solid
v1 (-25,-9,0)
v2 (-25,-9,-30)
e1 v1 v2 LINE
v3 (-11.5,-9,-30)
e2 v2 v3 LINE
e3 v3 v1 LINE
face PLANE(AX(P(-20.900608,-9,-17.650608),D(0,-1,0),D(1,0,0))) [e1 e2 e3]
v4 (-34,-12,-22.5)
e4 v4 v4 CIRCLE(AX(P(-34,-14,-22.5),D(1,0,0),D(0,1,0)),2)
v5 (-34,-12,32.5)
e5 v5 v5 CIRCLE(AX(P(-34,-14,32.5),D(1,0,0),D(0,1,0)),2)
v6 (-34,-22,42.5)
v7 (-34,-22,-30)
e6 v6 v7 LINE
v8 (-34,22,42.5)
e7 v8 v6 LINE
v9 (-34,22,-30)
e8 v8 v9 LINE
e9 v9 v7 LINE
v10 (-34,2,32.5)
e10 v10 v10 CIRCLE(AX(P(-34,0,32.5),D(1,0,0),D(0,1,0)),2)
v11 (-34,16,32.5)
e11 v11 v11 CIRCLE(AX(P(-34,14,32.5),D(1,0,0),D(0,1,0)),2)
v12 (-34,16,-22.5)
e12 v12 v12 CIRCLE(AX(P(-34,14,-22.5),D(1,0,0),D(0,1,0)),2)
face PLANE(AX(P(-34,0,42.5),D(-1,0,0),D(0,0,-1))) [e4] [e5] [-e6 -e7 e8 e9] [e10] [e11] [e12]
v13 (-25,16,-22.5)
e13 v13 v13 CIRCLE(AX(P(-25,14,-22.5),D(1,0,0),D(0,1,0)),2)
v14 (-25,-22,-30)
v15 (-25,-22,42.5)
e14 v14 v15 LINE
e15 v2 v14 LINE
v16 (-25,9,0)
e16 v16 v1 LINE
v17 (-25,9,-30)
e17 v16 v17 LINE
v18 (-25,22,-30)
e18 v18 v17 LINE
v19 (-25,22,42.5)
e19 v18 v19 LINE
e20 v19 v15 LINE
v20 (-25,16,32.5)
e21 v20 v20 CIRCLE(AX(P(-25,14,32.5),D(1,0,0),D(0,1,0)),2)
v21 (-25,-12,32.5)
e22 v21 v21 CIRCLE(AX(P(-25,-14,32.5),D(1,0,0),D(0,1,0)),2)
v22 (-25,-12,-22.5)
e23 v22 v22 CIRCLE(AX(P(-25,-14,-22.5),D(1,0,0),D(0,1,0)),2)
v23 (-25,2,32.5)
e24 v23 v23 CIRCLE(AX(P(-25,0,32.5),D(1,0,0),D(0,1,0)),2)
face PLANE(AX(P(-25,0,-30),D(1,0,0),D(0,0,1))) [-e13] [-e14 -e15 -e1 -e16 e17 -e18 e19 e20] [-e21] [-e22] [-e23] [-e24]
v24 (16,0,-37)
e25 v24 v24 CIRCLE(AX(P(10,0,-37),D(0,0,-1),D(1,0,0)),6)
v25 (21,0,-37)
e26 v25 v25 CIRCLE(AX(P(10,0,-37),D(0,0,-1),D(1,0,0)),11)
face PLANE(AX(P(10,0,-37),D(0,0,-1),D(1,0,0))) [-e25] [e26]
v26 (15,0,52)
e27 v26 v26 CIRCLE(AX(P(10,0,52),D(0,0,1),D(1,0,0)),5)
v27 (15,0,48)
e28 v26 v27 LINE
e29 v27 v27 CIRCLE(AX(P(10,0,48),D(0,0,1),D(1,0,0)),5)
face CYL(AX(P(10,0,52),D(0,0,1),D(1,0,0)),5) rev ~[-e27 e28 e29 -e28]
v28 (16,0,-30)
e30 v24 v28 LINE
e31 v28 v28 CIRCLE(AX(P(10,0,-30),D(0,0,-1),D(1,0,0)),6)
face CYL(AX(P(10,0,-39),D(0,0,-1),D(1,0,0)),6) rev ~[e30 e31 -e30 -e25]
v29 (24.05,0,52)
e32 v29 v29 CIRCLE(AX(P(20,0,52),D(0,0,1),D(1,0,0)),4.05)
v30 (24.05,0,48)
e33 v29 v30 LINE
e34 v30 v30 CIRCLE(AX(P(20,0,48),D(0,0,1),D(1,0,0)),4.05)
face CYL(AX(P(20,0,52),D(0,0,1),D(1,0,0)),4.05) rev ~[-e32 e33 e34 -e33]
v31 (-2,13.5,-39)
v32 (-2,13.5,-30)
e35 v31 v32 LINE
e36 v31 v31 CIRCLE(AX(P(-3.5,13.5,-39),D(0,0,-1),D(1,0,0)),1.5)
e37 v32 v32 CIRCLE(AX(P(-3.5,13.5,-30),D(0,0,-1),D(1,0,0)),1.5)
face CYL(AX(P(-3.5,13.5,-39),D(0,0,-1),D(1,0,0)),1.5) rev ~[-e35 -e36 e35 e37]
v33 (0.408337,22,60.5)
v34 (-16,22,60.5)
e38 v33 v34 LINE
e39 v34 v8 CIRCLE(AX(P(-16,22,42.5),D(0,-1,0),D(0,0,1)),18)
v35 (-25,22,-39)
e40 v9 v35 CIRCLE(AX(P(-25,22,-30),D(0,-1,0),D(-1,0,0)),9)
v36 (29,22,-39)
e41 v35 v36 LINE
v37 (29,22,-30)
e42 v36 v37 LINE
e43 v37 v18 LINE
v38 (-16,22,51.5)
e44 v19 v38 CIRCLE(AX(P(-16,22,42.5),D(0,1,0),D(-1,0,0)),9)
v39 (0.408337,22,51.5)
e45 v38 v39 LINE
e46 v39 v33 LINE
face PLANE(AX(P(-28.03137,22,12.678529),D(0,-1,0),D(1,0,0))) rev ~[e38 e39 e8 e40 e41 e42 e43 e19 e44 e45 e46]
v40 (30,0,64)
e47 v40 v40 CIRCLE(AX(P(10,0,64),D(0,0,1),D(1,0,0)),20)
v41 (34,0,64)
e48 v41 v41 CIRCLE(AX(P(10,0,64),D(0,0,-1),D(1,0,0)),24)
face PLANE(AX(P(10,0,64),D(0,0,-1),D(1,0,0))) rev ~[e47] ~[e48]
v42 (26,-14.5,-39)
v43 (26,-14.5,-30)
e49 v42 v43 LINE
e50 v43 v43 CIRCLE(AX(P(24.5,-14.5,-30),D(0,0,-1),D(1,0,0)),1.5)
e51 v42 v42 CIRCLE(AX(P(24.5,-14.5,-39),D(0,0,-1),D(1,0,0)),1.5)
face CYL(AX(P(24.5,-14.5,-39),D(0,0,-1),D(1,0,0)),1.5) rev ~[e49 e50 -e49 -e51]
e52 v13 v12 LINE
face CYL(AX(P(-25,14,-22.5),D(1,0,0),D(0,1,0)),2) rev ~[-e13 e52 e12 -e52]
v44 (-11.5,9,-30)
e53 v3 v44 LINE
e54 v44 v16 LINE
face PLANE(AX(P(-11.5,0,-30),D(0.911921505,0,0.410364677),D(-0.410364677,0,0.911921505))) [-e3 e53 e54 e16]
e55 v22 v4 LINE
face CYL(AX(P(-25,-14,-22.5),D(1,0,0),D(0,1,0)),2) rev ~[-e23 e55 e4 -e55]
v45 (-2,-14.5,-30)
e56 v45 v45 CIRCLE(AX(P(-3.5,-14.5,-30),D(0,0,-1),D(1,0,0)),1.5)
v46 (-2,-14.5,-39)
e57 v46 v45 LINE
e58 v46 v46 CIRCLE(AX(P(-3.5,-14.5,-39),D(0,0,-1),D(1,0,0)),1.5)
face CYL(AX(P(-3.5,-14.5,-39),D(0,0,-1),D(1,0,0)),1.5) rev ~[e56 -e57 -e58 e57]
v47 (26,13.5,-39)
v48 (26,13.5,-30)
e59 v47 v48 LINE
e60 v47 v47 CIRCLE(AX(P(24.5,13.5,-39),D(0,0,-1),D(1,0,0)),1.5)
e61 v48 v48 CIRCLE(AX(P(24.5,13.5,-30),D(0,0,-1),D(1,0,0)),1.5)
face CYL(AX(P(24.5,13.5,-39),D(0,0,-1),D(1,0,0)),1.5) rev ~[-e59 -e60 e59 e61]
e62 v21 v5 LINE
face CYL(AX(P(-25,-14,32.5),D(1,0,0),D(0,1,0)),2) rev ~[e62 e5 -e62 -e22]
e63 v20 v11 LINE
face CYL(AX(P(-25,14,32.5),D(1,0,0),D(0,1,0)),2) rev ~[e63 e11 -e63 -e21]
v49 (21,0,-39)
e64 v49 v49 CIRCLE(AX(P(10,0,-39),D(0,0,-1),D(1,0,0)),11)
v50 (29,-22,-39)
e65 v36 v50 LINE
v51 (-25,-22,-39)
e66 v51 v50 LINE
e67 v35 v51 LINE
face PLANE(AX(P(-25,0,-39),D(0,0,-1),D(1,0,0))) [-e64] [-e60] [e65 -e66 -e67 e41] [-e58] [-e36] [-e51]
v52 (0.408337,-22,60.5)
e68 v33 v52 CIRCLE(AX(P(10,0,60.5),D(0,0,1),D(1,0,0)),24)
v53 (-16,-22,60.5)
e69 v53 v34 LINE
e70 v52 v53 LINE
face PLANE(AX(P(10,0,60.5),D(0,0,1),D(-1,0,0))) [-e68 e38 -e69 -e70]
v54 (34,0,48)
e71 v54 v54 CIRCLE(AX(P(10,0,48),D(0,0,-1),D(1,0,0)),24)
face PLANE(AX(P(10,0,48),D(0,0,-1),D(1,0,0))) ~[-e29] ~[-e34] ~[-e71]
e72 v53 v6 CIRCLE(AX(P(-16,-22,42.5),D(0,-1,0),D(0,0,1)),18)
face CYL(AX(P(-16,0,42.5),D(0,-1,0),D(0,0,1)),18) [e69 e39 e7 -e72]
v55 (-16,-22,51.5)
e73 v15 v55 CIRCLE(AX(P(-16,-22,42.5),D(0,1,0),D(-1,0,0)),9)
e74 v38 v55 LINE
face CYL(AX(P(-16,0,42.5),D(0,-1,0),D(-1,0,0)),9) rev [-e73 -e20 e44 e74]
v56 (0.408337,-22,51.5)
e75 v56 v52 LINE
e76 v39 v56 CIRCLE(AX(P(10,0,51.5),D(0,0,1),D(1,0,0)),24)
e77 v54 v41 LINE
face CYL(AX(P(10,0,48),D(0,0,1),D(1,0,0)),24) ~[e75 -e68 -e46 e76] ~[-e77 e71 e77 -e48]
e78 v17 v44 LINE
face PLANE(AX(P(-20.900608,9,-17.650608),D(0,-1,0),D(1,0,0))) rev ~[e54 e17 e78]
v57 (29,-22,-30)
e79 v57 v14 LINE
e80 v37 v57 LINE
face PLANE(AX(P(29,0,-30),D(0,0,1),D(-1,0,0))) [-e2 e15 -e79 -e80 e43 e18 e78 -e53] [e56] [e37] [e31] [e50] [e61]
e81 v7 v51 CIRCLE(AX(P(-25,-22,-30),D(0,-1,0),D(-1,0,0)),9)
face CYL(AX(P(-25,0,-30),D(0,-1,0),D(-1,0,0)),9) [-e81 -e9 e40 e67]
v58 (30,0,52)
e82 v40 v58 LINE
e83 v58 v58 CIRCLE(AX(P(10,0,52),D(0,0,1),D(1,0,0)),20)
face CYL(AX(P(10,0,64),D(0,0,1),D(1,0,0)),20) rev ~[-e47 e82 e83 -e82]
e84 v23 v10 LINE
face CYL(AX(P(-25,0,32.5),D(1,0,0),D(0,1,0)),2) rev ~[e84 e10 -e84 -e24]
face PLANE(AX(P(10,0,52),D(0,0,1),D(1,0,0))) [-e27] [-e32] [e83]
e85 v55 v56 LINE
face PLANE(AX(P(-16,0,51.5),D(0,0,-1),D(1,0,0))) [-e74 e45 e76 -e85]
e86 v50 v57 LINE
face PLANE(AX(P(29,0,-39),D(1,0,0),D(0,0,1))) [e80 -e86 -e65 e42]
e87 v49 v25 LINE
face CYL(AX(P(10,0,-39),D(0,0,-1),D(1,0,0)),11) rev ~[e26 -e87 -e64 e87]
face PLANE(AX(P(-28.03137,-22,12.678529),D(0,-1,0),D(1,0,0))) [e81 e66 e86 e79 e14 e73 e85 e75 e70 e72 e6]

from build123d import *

# Parameters (mm, degrees)
F0_W      = 2
F0_H      = 9
F0_W_2    = 24
F1_DEPTH  = 22
F3_R      = 20
F4_DEPTH  = 12
F5_R      = 5
F5_R_2    = 4.05
F6_DEPTH  = 50
F7_R      = 2
F8_DEPTH  = 9.001
F9_R      = 11
F10_DEPTH = 2
F11_R     = 1.5
F12_DEPTH = 20
F13_R     = 6
F14_DEPTH = 25
F15_DEPTH = 9


with BuildPart() as f1:
    # F0 (on Front) → F1 (new body, symmetric)
    with BuildSketch(Plane.XZ):
        with BuildLine():
            Line((-16, 51.5), (-16, 60.5))
            ThreePointArc((-16, 60.5), (-28.7279220614, 55.2279220614), (-34, 42.5))
            Line((-34, 42.5), (-34, -30))
            ThreePointArc((-34, -30), (-31.3639610307, -36.3639610307), (-25, -39))
            Line((-25, -39), (-25, -30))
            Line((-25, -30), (-25, 0))
            Line((-25, 0), (-25, 42.5))
            ThreePointArc((-25, 42.5), (-22.3639610307, 48.8639610307), (-16, 51.5))
        make_face()
        with Locations((-15, 56)):
            Rectangle(F0_W, F0_H)
        with Locations((-2, 56)):
            Rectangle(F0_W_2, F0_H)
        Polygon((-25, -30), (-25, -39), (29, -39), (29, -30), (-11.5, -30), align=None)
    extrude(amount=F1_DEPTH, both=True)

    # F0 (on Front) → F2 (revolve)
    with BuildSketch(Plane.XZ):
        Polygon((34, 64), (10, 64), (10, 60.5), (10, 51.5), (10, 48), (34, 48), align=None)
    revolve(axis=Axis((10, 0, 55.4929765165), (0, 0, -1)))

    # F3 (on face) → F4 (cut)
    with BuildSketch(Plane.XY.offset(64)):
        with Locations((10, 0)):
            Circle(F3_R)
    extrude(amount=-F4_DEPTH, mode=Mode.SUBTRACT)

    # F5 (on face) → F6 (cut)
    with BuildSketch(Plane.XY.offset(52)):
        with Locations((10, 0)):
            Circle(F5_R)
        with Locations((20, 0)):
            Circle(F5_R_2)
    extrude(amount=-F6_DEPTH, mode=Mode.SUBTRACT)

    # F7 (on face) → F8 (cut, through all)
    with BuildSketch(Plane.YZ.offset(-25)):
        with Locations((14, -22.5)):
            Circle(F7_R)
        with Locations((14, 32.5)):
            Circle(F7_R)
        with Locations((0, 32.5)):
            Circle(F7_R)
        with Locations((-14, -22.5)):
            Circle(F7_R)
        with Locations((-14, 32.5)):
            Circle(F7_R)
    extrude(amount=-F8_DEPTH, mode=Mode.SUBTRACT)

    # F9 (on face) → F10 (cut)
    with BuildSketch(Plane(origin=(0, 0, -39), x_dir=(1, 0, 0), z_dir=(0, 0, -1))):
        with Locations((10, 0)):
            Circle(F9_R)
    extrude(amount=-F10_DEPTH, mode=Mode.SUBTRACT)

    # F11 (on face) → F12 (cut)
    with BuildSketch(Plane(origin=(0, 0, -39), x_dir=(1, 0, 0), z_dir=(0, 0, -1))):
        with Locations((-3.5, -13.5)):
            Circle(F11_R)
        with Locations((-3.5, 14.5)):
            Circle(F11_R)
        with Locations((24.5, -13.5)):
            Circle(F11_R)
        with Locations((24.5, 14.5)):
            Circle(F11_R)
        with Locations((52.5, -13.5)):
            Circle(F11_R)
        with Locations((52.5, 14.5)):
            Circle(F11_R)
    extrude(amount=-F12_DEPTH, mode=Mode.SUBTRACT)

    # F13 (on face) → F14 (cut)
    with BuildSketch(Plane(origin=(0, 0, -39), x_dir=(1, 0, 0), z_dir=(0, 0, -1))):
        with Locations((10, 0)):
            Circle(F13_R)
    extrude(amount=-F14_DEPTH, mode=Mode.SUBTRACT)

    # F0 (on Front) → F15 (join, symmetric)
    with BuildSketch(Plane.XZ):
        Polygon((-11.5, -30), (-25, 0), (-25, -30), align=None)
    extrude(amount=F15_DEPTH, both=True)


solid = f1.part
